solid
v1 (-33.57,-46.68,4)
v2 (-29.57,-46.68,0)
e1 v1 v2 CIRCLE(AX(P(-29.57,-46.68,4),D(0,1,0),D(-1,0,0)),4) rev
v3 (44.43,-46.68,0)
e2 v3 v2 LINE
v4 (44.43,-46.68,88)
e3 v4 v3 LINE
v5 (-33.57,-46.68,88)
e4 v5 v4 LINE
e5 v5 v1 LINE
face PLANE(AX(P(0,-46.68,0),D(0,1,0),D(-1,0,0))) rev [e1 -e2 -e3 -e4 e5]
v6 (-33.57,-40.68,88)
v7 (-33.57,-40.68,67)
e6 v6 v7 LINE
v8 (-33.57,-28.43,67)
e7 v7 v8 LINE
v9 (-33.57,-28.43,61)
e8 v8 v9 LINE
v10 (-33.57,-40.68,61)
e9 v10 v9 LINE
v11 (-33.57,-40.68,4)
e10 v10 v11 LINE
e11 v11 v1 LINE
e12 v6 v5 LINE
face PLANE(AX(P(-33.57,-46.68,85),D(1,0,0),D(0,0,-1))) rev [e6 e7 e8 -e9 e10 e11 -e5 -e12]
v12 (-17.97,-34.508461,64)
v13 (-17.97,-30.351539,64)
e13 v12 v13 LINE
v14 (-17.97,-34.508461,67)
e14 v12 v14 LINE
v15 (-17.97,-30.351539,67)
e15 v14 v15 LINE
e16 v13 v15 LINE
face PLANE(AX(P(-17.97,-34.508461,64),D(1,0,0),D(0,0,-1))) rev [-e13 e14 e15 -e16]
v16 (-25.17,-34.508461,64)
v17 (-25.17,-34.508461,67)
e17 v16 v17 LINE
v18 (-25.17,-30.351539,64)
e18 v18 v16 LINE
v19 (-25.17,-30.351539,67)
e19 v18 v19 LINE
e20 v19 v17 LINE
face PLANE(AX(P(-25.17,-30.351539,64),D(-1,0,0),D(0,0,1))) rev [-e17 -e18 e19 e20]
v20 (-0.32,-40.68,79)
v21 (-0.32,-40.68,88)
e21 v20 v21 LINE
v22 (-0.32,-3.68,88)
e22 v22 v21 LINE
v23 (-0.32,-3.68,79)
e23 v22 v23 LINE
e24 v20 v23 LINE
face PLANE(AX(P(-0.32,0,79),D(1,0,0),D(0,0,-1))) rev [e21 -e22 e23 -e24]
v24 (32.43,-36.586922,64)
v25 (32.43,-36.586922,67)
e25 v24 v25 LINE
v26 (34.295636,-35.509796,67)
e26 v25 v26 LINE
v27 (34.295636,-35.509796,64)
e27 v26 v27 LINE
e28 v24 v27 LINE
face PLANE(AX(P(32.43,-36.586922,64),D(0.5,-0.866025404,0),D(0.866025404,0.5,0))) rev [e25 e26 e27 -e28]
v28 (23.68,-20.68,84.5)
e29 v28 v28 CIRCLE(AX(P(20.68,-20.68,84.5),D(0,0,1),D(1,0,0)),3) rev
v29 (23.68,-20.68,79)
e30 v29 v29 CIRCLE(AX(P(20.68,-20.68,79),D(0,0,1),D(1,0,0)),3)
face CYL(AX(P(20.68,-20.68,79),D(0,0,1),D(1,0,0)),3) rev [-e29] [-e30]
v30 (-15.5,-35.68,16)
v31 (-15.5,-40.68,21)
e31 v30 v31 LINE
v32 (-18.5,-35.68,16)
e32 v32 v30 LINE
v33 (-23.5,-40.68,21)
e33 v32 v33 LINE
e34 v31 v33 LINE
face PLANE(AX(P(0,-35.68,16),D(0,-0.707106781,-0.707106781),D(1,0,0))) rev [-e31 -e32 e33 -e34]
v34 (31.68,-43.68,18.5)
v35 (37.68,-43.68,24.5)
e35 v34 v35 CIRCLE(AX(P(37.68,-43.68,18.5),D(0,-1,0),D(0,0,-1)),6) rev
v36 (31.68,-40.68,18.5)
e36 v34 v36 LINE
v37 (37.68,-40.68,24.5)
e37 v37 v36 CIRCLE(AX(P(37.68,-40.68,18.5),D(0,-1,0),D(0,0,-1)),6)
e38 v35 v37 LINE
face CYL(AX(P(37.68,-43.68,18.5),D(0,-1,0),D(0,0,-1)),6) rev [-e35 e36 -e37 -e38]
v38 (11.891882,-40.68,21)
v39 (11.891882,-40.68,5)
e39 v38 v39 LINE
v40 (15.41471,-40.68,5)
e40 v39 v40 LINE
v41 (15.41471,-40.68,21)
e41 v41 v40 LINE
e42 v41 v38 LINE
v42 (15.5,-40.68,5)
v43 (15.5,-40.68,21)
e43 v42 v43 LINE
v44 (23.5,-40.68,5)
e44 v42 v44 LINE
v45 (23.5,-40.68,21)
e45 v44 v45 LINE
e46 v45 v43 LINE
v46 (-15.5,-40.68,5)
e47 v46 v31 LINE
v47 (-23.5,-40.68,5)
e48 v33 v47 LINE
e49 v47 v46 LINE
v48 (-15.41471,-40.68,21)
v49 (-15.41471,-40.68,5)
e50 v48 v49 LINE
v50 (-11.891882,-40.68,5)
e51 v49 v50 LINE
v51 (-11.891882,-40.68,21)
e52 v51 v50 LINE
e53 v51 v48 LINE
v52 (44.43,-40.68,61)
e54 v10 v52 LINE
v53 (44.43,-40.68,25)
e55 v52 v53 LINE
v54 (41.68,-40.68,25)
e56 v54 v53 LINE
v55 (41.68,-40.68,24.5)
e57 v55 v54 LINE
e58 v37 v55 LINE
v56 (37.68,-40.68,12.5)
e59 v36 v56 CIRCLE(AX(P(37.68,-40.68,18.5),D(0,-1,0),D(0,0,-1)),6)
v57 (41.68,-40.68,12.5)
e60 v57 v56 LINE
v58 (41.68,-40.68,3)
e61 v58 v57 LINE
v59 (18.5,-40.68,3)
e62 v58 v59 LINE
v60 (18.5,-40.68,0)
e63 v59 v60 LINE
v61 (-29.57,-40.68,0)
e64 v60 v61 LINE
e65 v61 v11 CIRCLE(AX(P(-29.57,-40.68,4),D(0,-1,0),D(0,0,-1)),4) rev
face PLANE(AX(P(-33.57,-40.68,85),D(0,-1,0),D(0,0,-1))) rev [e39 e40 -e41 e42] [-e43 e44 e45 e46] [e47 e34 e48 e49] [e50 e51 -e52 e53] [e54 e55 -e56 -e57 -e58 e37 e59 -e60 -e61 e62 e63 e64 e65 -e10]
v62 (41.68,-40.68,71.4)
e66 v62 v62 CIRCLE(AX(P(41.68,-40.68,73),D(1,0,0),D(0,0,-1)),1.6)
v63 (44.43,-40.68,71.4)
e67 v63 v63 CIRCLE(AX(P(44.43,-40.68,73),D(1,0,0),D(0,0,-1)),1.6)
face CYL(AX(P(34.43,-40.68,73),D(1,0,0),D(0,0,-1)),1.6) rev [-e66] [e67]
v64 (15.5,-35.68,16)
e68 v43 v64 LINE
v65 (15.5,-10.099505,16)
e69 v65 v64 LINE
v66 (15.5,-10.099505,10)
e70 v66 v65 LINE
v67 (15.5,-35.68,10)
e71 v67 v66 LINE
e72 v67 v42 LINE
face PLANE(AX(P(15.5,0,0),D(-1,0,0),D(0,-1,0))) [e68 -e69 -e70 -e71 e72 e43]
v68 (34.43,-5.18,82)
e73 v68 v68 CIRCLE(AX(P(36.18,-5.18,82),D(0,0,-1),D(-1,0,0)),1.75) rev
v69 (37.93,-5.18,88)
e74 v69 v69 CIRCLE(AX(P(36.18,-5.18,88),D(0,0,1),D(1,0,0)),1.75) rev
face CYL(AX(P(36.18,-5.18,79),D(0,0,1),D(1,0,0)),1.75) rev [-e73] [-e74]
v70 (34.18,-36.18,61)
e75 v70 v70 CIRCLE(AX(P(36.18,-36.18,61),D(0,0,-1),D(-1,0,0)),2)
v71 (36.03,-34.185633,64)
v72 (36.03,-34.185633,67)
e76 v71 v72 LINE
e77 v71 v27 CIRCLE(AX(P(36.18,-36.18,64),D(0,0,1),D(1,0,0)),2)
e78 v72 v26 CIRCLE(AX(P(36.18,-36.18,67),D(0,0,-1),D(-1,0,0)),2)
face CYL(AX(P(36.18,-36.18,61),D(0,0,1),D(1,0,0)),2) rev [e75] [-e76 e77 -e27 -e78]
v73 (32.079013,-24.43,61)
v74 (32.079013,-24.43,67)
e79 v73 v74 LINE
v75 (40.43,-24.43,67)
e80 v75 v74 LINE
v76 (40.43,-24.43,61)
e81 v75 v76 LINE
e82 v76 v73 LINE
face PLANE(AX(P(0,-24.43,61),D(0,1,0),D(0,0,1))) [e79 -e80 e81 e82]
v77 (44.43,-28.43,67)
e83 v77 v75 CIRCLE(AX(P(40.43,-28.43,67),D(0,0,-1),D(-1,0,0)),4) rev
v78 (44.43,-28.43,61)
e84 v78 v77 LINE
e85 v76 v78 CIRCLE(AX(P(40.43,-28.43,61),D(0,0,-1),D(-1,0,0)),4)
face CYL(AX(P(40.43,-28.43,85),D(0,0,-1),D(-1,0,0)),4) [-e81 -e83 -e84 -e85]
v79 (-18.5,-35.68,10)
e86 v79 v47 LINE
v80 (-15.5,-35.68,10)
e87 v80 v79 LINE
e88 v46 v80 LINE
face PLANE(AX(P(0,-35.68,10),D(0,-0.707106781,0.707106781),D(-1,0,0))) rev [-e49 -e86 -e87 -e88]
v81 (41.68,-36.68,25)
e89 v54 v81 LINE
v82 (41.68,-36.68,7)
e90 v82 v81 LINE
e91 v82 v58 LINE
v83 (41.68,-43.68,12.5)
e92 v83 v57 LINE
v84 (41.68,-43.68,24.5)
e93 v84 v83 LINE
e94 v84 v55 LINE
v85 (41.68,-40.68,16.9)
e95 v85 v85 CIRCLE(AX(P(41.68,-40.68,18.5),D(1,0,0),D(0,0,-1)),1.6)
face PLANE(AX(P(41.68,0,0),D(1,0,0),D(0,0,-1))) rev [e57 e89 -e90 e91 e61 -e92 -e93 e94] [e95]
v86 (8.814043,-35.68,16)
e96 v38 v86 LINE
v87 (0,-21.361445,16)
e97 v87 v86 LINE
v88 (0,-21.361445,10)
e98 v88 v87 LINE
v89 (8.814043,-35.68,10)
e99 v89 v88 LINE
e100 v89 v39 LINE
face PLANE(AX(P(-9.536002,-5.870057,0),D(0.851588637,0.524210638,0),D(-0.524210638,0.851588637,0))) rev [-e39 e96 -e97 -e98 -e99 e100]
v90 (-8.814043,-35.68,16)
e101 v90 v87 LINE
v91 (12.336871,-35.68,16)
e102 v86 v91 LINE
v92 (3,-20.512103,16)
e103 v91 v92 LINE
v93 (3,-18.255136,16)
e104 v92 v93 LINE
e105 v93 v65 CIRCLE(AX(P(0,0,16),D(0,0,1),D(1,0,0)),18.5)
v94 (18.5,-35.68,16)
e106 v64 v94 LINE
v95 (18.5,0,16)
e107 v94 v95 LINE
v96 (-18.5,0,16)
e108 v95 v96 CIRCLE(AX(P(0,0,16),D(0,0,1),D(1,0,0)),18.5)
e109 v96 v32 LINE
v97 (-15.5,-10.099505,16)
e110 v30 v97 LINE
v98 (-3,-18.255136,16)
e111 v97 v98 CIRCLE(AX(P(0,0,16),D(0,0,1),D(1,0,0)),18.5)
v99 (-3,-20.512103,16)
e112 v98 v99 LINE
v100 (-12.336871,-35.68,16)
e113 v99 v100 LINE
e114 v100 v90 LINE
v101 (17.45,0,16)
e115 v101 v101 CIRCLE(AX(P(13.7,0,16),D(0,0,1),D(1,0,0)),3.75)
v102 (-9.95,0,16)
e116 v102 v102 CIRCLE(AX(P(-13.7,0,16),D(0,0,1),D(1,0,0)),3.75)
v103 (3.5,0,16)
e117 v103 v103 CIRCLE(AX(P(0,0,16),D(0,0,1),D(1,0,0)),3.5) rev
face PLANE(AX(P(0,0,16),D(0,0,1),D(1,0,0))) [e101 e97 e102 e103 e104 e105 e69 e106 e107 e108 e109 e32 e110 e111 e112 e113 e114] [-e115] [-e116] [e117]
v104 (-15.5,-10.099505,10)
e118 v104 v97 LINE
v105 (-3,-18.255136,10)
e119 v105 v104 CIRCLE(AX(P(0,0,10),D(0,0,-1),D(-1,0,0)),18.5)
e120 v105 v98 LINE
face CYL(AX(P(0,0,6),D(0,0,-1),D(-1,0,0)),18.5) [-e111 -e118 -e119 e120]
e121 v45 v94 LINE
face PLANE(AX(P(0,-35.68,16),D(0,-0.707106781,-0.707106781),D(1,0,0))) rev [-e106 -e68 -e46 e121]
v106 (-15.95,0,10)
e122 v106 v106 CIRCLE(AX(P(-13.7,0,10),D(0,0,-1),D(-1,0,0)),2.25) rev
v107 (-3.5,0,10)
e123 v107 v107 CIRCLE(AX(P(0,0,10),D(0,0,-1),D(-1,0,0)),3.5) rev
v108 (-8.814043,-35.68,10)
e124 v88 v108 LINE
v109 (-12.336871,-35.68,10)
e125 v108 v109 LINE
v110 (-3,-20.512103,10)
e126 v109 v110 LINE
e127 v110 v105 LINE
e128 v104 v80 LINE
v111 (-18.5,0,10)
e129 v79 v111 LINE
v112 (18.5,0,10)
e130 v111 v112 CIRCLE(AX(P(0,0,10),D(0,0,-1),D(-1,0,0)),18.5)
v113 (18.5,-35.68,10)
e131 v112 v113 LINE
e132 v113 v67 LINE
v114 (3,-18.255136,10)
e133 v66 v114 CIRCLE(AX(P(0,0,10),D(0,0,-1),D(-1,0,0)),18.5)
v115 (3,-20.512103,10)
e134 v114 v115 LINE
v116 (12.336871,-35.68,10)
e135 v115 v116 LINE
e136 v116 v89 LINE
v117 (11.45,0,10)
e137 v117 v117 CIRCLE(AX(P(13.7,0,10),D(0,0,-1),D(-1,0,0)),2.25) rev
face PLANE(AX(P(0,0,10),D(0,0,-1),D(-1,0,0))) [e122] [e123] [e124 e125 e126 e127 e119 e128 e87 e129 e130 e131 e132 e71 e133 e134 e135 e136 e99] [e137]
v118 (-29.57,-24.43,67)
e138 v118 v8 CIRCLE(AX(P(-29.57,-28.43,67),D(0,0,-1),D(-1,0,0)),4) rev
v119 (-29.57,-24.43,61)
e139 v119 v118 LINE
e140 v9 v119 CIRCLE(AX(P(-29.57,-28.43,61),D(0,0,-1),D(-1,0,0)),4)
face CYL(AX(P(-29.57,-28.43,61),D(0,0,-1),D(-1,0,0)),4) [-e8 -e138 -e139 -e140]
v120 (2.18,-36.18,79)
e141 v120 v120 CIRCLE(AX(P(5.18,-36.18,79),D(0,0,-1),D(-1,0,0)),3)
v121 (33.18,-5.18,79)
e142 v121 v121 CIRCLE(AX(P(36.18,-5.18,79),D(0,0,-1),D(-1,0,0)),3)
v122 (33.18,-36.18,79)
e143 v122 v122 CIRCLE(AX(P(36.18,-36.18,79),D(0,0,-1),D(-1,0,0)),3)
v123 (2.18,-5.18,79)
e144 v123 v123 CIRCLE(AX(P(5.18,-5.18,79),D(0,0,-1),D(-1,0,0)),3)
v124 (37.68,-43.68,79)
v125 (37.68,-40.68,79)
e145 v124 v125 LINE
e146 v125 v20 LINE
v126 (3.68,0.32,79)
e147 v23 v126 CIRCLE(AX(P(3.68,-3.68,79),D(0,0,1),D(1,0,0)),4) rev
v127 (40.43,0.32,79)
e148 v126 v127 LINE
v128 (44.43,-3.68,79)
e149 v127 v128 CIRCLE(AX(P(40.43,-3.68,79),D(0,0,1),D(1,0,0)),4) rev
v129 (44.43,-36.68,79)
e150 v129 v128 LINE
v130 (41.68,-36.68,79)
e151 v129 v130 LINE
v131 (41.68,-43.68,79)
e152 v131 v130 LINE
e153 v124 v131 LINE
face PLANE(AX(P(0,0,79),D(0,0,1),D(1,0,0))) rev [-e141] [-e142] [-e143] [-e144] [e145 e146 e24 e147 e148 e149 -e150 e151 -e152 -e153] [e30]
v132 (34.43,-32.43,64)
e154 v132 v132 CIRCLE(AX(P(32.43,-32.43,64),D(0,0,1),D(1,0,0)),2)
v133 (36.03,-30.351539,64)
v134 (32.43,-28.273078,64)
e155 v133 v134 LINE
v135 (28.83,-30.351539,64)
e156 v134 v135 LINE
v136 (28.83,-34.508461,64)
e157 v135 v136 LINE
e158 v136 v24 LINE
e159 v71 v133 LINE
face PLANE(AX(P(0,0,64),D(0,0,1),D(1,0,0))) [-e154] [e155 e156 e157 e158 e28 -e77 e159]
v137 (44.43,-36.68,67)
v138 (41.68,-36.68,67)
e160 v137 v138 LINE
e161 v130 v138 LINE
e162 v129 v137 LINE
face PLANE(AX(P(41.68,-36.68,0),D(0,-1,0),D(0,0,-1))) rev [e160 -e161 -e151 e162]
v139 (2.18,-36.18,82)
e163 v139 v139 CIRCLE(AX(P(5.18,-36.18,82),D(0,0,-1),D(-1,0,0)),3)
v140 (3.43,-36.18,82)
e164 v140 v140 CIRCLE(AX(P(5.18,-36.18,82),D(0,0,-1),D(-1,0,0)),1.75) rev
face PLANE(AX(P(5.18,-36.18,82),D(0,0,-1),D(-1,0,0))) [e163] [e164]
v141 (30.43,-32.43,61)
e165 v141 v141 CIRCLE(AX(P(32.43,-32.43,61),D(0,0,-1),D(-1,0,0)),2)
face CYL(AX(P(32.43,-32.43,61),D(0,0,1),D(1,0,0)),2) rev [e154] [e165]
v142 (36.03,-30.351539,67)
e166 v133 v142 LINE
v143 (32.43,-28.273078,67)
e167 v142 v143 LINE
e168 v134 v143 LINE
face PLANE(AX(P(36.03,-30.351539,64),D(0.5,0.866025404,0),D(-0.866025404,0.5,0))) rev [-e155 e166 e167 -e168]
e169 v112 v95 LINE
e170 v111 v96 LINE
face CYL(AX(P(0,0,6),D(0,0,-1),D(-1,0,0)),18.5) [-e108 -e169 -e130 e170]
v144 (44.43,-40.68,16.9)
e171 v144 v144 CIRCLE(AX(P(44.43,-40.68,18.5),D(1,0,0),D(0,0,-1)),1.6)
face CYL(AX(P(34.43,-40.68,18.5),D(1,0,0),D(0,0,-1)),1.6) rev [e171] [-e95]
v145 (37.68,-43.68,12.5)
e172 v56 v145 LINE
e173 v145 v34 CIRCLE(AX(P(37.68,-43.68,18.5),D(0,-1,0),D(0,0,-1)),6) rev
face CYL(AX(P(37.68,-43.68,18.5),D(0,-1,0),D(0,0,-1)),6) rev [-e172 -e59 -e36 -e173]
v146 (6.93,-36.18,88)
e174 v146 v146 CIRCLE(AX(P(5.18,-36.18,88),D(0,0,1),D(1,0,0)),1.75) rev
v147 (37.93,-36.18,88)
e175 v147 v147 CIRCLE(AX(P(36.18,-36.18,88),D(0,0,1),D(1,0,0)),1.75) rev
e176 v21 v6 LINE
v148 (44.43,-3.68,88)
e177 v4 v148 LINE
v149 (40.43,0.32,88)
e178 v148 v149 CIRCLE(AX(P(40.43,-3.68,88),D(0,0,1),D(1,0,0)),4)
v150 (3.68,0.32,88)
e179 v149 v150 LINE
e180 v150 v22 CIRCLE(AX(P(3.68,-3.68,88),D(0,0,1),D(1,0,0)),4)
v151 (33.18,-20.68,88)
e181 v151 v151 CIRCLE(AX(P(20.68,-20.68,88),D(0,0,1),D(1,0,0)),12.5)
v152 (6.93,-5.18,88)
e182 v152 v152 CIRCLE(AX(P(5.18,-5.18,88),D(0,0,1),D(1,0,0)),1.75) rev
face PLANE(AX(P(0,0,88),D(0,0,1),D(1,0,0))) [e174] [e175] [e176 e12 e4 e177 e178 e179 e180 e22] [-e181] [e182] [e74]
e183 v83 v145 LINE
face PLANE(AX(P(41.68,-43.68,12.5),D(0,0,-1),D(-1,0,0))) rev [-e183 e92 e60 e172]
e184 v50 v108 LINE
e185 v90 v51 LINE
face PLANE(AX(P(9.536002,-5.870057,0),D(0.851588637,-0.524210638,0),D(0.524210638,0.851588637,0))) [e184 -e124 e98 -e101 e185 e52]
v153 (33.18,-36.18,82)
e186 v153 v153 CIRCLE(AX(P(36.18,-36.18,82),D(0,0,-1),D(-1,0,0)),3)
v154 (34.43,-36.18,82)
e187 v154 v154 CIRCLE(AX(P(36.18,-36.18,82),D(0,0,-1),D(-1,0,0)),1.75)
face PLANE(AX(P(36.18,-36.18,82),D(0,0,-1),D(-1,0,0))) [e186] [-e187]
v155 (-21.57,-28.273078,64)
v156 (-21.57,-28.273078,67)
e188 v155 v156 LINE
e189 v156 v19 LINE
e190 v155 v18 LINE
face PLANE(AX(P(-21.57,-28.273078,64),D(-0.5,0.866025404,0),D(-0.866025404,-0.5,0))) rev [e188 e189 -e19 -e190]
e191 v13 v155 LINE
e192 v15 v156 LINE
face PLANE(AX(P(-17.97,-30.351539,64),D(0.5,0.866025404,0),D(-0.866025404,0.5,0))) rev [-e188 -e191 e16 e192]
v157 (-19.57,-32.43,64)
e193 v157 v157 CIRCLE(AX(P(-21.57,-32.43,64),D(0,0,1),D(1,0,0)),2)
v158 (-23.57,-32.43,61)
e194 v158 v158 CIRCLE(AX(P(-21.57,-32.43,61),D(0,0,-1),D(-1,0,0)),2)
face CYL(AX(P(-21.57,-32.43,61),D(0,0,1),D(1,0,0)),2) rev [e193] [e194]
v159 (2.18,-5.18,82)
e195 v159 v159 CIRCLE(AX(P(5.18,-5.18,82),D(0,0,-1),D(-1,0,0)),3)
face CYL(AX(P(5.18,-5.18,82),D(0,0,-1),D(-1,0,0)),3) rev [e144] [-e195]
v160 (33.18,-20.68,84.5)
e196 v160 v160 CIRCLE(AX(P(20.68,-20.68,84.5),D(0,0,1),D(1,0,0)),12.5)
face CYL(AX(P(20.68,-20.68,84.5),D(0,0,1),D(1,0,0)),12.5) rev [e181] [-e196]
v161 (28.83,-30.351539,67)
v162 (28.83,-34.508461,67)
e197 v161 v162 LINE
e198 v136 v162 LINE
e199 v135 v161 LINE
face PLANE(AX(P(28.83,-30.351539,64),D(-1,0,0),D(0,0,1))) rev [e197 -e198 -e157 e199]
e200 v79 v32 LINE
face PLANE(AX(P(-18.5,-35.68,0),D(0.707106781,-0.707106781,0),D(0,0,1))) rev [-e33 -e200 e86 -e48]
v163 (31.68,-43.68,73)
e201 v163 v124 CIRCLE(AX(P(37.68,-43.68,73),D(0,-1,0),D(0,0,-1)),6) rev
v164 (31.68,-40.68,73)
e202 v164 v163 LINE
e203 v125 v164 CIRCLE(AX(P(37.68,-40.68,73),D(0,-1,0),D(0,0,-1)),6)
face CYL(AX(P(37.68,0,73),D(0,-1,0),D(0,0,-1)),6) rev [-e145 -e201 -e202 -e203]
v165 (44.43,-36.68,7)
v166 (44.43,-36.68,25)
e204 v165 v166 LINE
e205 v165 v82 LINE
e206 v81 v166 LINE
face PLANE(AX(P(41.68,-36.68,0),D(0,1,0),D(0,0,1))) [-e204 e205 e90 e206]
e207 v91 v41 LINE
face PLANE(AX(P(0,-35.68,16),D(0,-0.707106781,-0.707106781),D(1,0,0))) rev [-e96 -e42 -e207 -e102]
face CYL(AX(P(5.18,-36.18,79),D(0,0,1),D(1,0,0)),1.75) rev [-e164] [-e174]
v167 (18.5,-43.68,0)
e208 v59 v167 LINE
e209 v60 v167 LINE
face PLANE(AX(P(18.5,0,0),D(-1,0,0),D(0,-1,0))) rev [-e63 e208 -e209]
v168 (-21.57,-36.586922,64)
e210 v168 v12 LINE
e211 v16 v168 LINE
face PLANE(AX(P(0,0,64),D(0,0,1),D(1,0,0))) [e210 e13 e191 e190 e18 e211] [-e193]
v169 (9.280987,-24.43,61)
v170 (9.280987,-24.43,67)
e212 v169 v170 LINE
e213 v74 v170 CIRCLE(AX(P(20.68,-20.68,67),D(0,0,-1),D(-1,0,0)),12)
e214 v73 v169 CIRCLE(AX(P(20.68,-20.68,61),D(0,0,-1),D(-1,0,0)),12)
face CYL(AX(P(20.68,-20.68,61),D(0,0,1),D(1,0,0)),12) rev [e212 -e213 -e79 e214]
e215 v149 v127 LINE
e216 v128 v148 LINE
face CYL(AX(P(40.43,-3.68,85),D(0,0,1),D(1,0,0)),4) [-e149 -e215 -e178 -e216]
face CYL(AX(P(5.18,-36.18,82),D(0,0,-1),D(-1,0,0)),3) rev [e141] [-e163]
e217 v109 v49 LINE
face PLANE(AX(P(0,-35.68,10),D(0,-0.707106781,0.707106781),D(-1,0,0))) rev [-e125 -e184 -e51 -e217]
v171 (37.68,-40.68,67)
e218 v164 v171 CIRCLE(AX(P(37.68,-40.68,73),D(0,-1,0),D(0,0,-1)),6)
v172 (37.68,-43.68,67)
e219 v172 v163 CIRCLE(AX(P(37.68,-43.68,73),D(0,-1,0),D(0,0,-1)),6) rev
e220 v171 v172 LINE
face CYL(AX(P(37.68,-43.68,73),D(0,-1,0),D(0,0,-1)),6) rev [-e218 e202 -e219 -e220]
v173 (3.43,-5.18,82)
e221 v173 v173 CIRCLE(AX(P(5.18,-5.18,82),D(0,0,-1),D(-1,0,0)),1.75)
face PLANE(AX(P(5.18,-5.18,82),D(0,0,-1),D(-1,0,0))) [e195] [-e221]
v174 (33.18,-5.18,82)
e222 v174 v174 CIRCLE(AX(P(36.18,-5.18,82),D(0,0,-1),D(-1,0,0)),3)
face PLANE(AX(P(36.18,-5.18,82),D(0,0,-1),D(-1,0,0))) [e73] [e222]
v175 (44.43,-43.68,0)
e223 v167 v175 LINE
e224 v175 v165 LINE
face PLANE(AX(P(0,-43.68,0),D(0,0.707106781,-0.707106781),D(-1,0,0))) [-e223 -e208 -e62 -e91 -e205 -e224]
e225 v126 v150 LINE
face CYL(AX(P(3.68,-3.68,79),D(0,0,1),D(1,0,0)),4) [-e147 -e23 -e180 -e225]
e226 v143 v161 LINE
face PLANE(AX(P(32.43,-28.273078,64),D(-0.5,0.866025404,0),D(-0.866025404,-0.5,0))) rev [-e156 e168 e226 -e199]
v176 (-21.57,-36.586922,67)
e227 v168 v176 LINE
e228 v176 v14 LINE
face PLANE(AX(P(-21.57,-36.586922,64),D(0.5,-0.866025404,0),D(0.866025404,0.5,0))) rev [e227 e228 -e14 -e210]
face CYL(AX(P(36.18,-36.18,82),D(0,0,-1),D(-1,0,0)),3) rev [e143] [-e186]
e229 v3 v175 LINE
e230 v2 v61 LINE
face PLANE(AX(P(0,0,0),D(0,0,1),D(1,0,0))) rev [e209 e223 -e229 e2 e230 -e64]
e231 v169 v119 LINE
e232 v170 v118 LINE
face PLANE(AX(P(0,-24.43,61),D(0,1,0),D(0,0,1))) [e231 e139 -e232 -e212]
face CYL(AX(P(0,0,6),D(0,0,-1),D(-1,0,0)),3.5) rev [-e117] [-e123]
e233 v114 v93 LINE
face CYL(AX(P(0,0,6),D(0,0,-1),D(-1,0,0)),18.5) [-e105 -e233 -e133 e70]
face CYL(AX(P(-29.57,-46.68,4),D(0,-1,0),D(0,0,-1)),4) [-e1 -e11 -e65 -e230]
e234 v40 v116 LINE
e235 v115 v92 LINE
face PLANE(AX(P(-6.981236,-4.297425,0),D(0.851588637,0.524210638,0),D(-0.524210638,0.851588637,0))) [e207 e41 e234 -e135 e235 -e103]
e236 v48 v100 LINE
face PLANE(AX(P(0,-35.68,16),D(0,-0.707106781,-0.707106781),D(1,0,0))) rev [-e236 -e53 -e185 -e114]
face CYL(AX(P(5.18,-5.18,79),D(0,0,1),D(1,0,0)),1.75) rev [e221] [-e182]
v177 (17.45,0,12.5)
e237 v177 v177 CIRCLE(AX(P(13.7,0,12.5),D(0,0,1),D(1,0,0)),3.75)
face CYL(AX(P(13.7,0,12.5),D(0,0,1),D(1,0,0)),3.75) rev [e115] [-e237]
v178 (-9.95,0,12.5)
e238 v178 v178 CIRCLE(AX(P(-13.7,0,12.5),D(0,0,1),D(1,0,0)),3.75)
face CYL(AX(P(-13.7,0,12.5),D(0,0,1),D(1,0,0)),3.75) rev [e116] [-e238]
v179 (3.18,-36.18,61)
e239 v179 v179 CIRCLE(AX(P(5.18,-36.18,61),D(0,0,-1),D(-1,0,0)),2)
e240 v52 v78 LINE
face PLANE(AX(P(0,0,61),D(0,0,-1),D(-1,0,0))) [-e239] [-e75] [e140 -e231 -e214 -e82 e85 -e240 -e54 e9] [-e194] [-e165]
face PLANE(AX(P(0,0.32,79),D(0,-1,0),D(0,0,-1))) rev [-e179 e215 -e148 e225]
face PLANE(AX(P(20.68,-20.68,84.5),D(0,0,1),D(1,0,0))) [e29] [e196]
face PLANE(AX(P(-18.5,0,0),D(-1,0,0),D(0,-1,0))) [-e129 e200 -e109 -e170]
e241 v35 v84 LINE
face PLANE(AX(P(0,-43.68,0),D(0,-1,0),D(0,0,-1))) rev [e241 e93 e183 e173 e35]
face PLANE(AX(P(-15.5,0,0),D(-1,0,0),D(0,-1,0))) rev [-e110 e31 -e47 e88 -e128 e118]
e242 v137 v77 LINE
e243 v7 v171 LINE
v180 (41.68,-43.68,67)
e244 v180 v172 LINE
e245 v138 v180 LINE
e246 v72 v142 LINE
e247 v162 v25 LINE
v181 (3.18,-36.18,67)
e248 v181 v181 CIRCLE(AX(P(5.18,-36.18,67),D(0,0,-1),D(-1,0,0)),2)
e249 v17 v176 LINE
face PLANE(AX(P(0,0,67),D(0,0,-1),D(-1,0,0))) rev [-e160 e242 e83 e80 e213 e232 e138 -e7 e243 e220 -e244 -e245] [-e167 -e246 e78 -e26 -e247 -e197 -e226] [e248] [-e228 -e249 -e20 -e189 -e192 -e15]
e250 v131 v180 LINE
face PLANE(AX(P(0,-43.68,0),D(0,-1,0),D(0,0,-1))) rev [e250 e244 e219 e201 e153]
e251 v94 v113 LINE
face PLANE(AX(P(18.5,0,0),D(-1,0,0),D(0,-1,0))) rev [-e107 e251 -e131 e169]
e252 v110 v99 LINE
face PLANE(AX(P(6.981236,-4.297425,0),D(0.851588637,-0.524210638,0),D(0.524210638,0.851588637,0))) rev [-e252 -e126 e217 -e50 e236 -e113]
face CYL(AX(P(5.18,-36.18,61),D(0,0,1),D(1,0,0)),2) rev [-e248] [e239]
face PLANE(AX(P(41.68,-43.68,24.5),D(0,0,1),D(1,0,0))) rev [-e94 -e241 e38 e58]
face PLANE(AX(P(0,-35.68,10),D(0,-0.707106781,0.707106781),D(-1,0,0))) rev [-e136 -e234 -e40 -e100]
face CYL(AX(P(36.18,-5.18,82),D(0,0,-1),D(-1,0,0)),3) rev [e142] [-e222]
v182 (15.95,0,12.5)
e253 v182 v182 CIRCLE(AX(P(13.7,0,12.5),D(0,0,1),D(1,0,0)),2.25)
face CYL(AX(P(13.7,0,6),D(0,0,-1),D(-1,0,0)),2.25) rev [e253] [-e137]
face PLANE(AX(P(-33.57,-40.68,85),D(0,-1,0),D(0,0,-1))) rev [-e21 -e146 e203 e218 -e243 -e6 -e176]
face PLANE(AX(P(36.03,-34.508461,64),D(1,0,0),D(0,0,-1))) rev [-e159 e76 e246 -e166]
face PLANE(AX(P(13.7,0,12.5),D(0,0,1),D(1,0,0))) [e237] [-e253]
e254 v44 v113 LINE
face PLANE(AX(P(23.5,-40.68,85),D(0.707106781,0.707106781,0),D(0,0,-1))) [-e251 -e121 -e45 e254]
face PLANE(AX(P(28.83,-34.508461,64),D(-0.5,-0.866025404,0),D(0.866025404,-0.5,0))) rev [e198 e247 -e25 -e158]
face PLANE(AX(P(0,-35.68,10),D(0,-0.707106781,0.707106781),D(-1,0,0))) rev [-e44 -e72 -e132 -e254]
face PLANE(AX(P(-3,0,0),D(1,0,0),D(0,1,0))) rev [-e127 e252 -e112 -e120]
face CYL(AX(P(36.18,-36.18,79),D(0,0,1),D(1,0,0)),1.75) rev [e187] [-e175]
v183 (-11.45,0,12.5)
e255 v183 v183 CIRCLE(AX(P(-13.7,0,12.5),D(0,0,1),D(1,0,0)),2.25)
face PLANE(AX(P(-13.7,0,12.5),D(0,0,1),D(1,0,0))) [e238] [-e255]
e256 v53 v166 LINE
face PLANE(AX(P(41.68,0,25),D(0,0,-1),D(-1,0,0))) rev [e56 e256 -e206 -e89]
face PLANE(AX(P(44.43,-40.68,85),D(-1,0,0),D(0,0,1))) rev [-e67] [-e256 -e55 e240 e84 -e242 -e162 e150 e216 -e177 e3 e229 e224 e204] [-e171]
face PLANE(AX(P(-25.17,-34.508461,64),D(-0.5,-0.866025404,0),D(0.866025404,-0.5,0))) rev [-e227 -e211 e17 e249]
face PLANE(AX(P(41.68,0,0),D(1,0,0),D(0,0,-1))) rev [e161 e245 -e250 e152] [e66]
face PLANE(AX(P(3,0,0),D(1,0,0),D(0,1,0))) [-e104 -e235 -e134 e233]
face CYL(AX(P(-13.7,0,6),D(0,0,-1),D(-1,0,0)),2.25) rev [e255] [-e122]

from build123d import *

# Parameters (mm, degrees)
SKETCH1_R           = 18.5
SKETCH1_R_2         = 3.5
SKETCH1_R_3         = 2.25
BOSS_EXTRUDE1_DEPTH = 6
BOSS_EXTRUDE2_START = -6
BOSS_EXTRUDE2_DEPTH = 6
BOSS_EXTRUDE3_DEPTH = 85
SKETCH6_R           = 2
BOSS_EXTRUDE5_DEPTH = 6
SKETCH5_W           = 42
SKETCH5_H           = 41
SKETCH5_R           = 1.75
SKETCH5_R_2         = 3
BOSS_EXTRUDE4_DEPTH = 6
SKETCH8_W           = 25
SKETCH8_H           = 7
BOSS_EXTRUDE7_DEPTH = 2.75
CHAMFER2_SIZE       = 7
SKETCH9_R           = 1.6
CUT_EXTRUDE2_DEPTH  = 10
SKETCH10_W          = 10
SKETCH10_H          = 12
CUT_EXTRUDE3_DEPTH  = 3
FILLET1_R           = 6
SKETCH11_R          = 2.25
SKETCH11_R_2        = 3.5
BOSS_EXTRUDE8_DEPTH = 10
SKETCH13_R          = 2.25
SKETCH13_R_2        = 3.5
CUT_EXTRUDE4_DEPTH  = 10
SKETCH14_R          = 3.75
CUT_EXTRUDE5_DEPTH  = 3.5
CHAMFER4_SIZE       = 5
FILLET2_R           = 4
CUT_EXTRUDE6_DEPTH  = 3
BOSS_EXTRUDE9_START = 3
SKETCH18_R          = 1.75
SKETCH18_R_2        = 3
SKETCH18_W          = 33.25
SKETCH18_H          = 6
BOSS_EXTRUDE9_DEPTH = 3
SKETCH16_R          = 12.5
CUT_EXTRUDE7_DEPTH  = 3.5
SKETCH20_R          = 3
CUT_EXTRUDE8_DEPTH  = 3


# Some blends are built 0.0001 mm under size
with BuildPart() as part:
    # Sketch1 → Boss-Extrude1 (new body)
    with BuildSketch(Plane.XY):
        Circle(SKETCH1_R)
        Circle(SKETCH1_R_2, mode=Mode.SUBTRACT)
        with Locations((-13.7, 0)):
            Circle(SKETCH1_R_3, mode=Mode.SUBTRACT)
        with Locations((13.7, 0)):
            Circle(SKETCH1_R_3, mode=Mode.SUBTRACT)
    extrude(amount=BOSS_EXTRUDE1_DEPTH)

    # Sketch3 → Boss-Extrude2 (add)
    with BuildSketch(Plane.XY.offset(6).offset(BOSS_EXTRUDE2_START)):
        with BuildLine():
            ThreePointArc((-15.5, -10.099504938), (-17.734147851, -5.267826876), (-18.5, 0))
            Line((-18.5, 0), (-18.5, -46.68))
            Line((-18.5, -46.68), (18.5, -46.68))
            Line((18.5, -46.68), (18.5, 0))
            ThreePointArc((18.5, 0), (17.734147851, -5.267826876), (15.5, -10.099504938))
            Line((15.5, -10.099504938), (15.5, -40.818554828))
            Line((15.5, -40.818554828), (15.5, -43.68))
            Line((15.5, -43.68), (13.738586173, -43.68))
            Line((13.738586173, -43.68), (-13.738586173, -43.68))
            Line((-13.738586173, -43.68), (-15.5, -43.68))
            Line((-15.5, -43.68), (-15.5, -40.818554828))
            Line((-15.5, -40.818554828), (-15.5, -10.099504938))
        make_face()
        with BuildLine():
            Line((-3, -20.512103215), (-15.5, -40.818554828))
            Line((-15.5, -40.818554828), (-15.5, -43.68))
            Line((-15.5, -43.68), (-13.738586173, -43.68))
            Line((-13.738586173, -43.68), (0, -21.361445172))
            Line((0, -21.361445172), (13.738586173, -43.68))
            Line((13.738586173, -43.68), (15.5, -43.68))
            Line((15.5, -43.68), (15.5, -40.818554828))
            Line((15.5, -40.818554828), (3, -20.512103215))
            Line((3, -20.512103215), (1.71251735, -18.420566884))
            ThreePointArc((1.71251735, -18.420566884), (0, -18.5), (-1.71251735, -18.420566884))
            Line((-1.71251735, -18.420566884), (-3, -20.512103215))
        make_face()
        with BuildLine():
            Line((3, -20.512103215), (3, -18.255136264))
            ThreePointArc((3, -18.255136264), (2.357710068, -18.349147207), (1.71251735, -18.420566884))
            Line((1.71251735, -18.420566884), (3, -20.512103215))
        make_face()
        with BuildLine():
            ThreePointArc((-1.71251735, -18.420566884), (-2.357710068, -18.349147207), (-3, -18.255136264))
            Line((-3, -18.255136264), (-3, -20.512103215))
            Line((-3, -20.512103215), (-1.71251735, -18.420566884))
        make_face()
    extrude(amount=BOSS_EXTRUDE2_DEPTH)

    # Sketch4 → Boss-Extrude3 (add)
    with BuildSketch(Plane.XY):
        Polygon((-33.57, -46.68), (-33.57, -40.68), (44.43, -40.68), (44.43, -46.68), (-18.5, -46.68), align=None)
    extrude(amount=BOSS_EXTRUDE3_DEPTH)

    # Sketch6 → Boss-Extrude5 (add)
    with BuildSketch(Plane(origin=(0, 0, 67), x_dir=(-1, 0, 0), z_dir=(0, 0, -1))):
        with BuildLine():
            Line((-44.43, -24.43), (-44.43, -43.68))
            Line((-44.43, -43.68), (33.57, -43.68))
            Line((33.57, -43.68), (33.57, -24.43))
            Line((33.57, -24.43), (-9.280986885, -24.43))
            ThreePointArc((-9.280986885, -24.43), (-20.68, -32.68), (-32.079013115, -24.43))
            Line((-32.079013115, -24.43), (-44.43, -24.43))
        make_face()
        with Locations((-36.18, -36.18)):
            Circle(SKETCH6_R, mode=Mode.SUBTRACT)
        with Locations((-32.43, -32.43)):
            Circle(SKETCH6_R, mode=Mode.SUBTRACT)
        with Locations((-5.18, -36.18)):
            Circle(SKETCH6_R, mode=Mode.SUBTRACT)
        with Locations((21.57, -32.43)):
            Circle(SKETCH6_R, mode=Mode.SUBTRACT)
    extrude(amount=BOSS_EXTRUDE5_DEPTH)

    # Sketch5 → Boss-Extrude4 (add)
    with BuildSketch(Plane.XY.offset(85)):
        with Locations((20.68, -20.18)):
            Rectangle(SKETCH5_W, SKETCH5_H)
        with Locations((5.18, -36.18)):
            Circle(SKETCH5_R, mode=Mode.SUBTRACT)
        with Locations((36.18, -36.18)):
            Circle(SKETCH5_R, mode=Mode.SUBTRACT)
        with Locations((5.18, -5.18)):
            Circle(SKETCH5_R, mode=Mode.SUBTRACT)
        with Locations((20.68, -20.68)):
            Circle(SKETCH5_R_2, mode=Mode.SUBTRACT)
        with Locations((36.18, -5.18)):
            Circle(SKETCH5_R, mode=Mode.SUBTRACT)
    extrude(amount=-BOSS_EXTRUDE4_DEPTH)

    # Sketch8 → Boss-Extrude7 (add)
    with BuildSketch(Plane(origin=(44.43, 0, 0), x_dir=(0, 0, -1), z_dir=(1, 0, 0))):
        with Locations((-12.5, -40.18)):
            Rectangle(SKETCH8_W, SKETCH8_H)
        Polygon((-61, -36.68), (-79, -36.68), (-79, 0.32), (-85, 0.32), (-85, -43.68), (-61, -43.68), align=None)
    extrude(amount=-BOSS_EXTRUDE7_DEPTH)

    # Chamfer2
    # the kernel refuses this chamfer: 7 mm, written as the material it takes off along each edge
    with BuildSketch(Plane(origin=(62.431780916, -36.68, 0), x_dir=(0, 0, 1), z_dir=(-1, 0, 0))) as chamfer2_piece_1:
        Polygon((CHAMFER2_SIZE, 0), (0, -CHAMFER2_SIZE), (0, 0), align=None)
    extrude(amount=38.753561832, mode=Mode.SUBTRACT)
    # the kernel refuses this chamfer: 7 mm, written as the material it takes off along each edge
    with BuildSketch(Plane(origin=(18.5, -40.68, 0), x_dir=(0, -1, 0), z_dir=(1, 0, 0))) as chamfer2_2_piece_1_section:
        Polygon((CHAMFER2_SIZE, 0), (0, -CHAMFER2_SIZE), (0, 0), align=None)
    chamfer2_2_piece_1 = extrude(amount=23.18, mode=Mode.PRIVATE)
    chamfer2_2_piece_1 = split(chamfer2_2_piece_1, bisect_by=Plane(origin=(18.5, -42.18, 1.5), z_dir=(0, 0.7071067811865476, -0.7071067811865476)), keep=Keep.TOP, mode=Mode.PRIVATE)
    add(chamfer2_2_piece_1, mode=Mode.SUBTRACT)

    # Sketch9 → Cut-Extrude2 (cut)
    with BuildSketch(Plane(origin=(44.43, 0, 0), x_dir=(0, 0, -1), z_dir=(1, 0, 0))):
        with Locations((-73, -40.68)):
            Circle(SKETCH9_R)
        with Locations((-18.5, -40.68)):
            Circle(SKETCH9_R)
    extrude(amount=-CUT_EXTRUDE2_DEPTH, mode=Mode.SUBTRACT)

    # Sketch10 → Cut-Extrude3 (cut)
    with BuildSketch(Plane(origin=(0, -40.68, 0), x_dir=(1, 0, 0), z_dir=(0, 1, 0))):
        with Locations((36.68, -18.5)):
            Rectangle(SKETCH10_W, SKETCH10_H)
        with Locations((36.68, -73)):
            Rectangle(SKETCH10_W, SKETCH10_H)
    extrude(amount=-CUT_EXTRUDE3_DEPTH, mode=Mode.SUBTRACT)

    # Fillet1
    fillet1_edges = [part.edges().sort_by_distance(p)[0] for p in [
        (31.68, -42.18, 67),
        (31.68, -42.18, 79),
        (31.68, -42.18, 24.5),
        (31.68, -42.18, 12.5),
    ]]
    fillet(fillet1_edges, radius=FILLET1_R - 0.0001)  # a hair under: the kernel refuses the full size

    # Sketch11 → Boss-Extrude8 (add)
    with BuildSketch(Plane.XY.offset(6)):
        with BuildLine():
            Line((-15.5, -40.68), (-15.5, -10.099504938))
            ThreePointArc((-15.5, -10.099504938), (-10.10896041, -15.493834884), (-3, -18.255136264))
            Line((-3, -18.255136264), (-3, -20.512103215))
            Line((-3, -20.512103215), (-15.414710094, -40.68))
            Line((-15.414710094, -40.68), (-11.89188244, -40.68))
            Line((-11.89188244, -40.68), (0, -21.361445172))
            Line((0, -21.361445172), (11.89188244, -40.68))
            Line((11.89188244, -40.68), (15.414710094, -40.68))
            Line((15.414710094, -40.68), (3, -20.512103215))
            Line((3, -20.512103215), (3, -18.255136264))
            ThreePointArc((3, -18.255136264), (10.10896041, -15.493834884), (15.5, -10.099504938))
            Line((15.5, -10.099504938), (15.5, -40.68))
            Line((15.5, -40.68), (18.5, -40.68))
            Line((18.5, -40.68), (18.5, 0))
            ThreePointArc((18.5, 0), (0, 18.5), (-18.5, 0))
            Line((-18.5, 0), (-18.5, -40.68))
            Line((-18.5, -40.68), (-15.5, -40.68))
        make_face()
        with Locations((13.7, 0)):
            Circle(SKETCH11_R, mode=Mode.SUBTRACT)
        with Locations((-13.7, 0)):
            Circle(SKETCH11_R, mode=Mode.SUBTRACT)
        Circle(SKETCH11_R_2, mode=Mode.SUBTRACT)
    extrude(amount=BOSS_EXTRUDE8_DEPTH)

    # Sketch13 → Cut-Extrude4 (cut)
    # profile 1 of 4: a face of its own
    with BuildSketch(Plane(origin=(0, 0, 0), x_dir=(-1, 0, 0), z_dir=(0, 0, -1))):
        with BuildLine():
            ThreePointArc((3, -18.255136264), (0, -18.5), (-3, -18.255136264))
            Line((-3, -18.255136264), (-3, -20.512103215))
            Line((-3, -20.512103215), (-15.414710094, -40.68))
            Line((-15.414710094, -40.68), (-11.89188244, -40.68))
            Line((-11.89188244, -40.68), (0, -21.361445172))
            Line((0, -21.361445172), (11.89188244, -40.68))
            Line((11.89188244, -40.68), (15.414710094, -40.68))
            Line((15.414710094, -40.68), (3, -20.512103215))
            Line((3, -20.512103215), (3, -18.255136264))
        make_face()
    # profile 2 of 4: a face of its own
    with BuildSketch(Plane(origin=(0, 0, 0), x_dir=(-1, 0, 0), z_dir=(0, 0, -1))):
        with BuildLine():
            ThreePointArc((-15.5, -10.099504938), (-17.734147851, -5.267826876), (-18.5, 0))
            Line((-18.5, 0), (-18.5, -40.68))
            Line((-18.5, -40.68), (-15.5, -40.68))
            Line((-15.5, -40.68), (-15.5, -10.099504938))
        make_face()
    # profile 3 of 4: a face of its own
    with BuildSketch(Plane(origin=(0, 0, 0), x_dir=(-1, 0, 0), z_dir=(0, 0, -1))):
        with BuildLine():
            Line((18.5, -40.68), (18.5, 0))
            ThreePointArc((18.5, 0), (17.734147851, -5.267826876), (15.5, -10.099504938))
            Line((15.5, -10.099504938), (15.5, -40.68))
            Line((15.5, -40.68), (18.5, -40.68))
        make_face()
    # profile 4 of 4: a face of its own
    with BuildSketch(Plane(origin=(0, 0, 0), x_dir=(-1, 0, 0), z_dir=(0, 0, -1))):
        with BuildLine():
            ThreePointArc((18.5, 0), (0, 18.5), (-18.5, 0))
            ThreePointArc((-18.5, 0), (-17.734147851, -5.267826876), (-15.5, -10.099504938))
            ThreePointArc((-15.5, -10.099504938), (-10.10896041, -15.493834884), (-3, -18.255136264))
            ThreePointArc((-3, -18.255136264), (0, -18.5), (3, -18.255136264))
            ThreePointArc((3, -18.255136264), (10.10896041, -15.493834884), (15.5, -10.099504938))
            ThreePointArc((15.5, -10.099504938), (17.734147851, -5.267826876), (18.5, 0))
        make_face()
        with Locations((-13.7, 0)):
            Circle(SKETCH13_R, mode=Mode.SUBTRACT)
        Circle(SKETCH13_R_2, mode=Mode.SUBTRACT)
        with Locations((13.7, 0)):
            Circle(SKETCH13_R, mode=Mode.SUBTRACT)
    extrude(amount=-CUT_EXTRUDE4_DEPTH, mode=Mode.SUBTRACT)

    # Sketch14 → Cut-Extrude5 (cut)
    with BuildSketch(Plane.XY.offset(16)):
        with Locations((-13.7, 0)):
            Circle(SKETCH14_R)
        with Locations((13.7, 0)):
            Circle(SKETCH14_R)
    extrude(amount=-CUT_EXTRUDE5_DEPTH, mode=Mode.SUBTRACT)

    # Chamfer4
    chamfer4_edges = [part.edges().sort_by_distance(p)[0] for p in [
        (-17, -40.68, 16),
        (-13.653296267, -40.68, 16),
        (13.653296267, -40.68, 16),
        (17, -40.68, 16),
        (-18.5, -40.68, 13),
        (18.5, -40.68, 13),
        (-13.653296267, -40.68, 10),
        (13.653296267, -40.68, 10),
        (17, -40.68, 10),
        (-17, -40.68, 10),
    ]]
    chamfer(chamfer4_edges, length=CHAMFER4_SIZE)

    # Fillet2
    fillet2_edges = [part.edges().sort_by_distance(p)[0] for p in [
        (44.43, -24.43, 64),
        (-33.57, -24.43, 64),
        (-0.32, 0.32, 82),
        (44.43, 0.32, 82),
        (-33.57, -43.68, 0),
    ]]
    fillet(fillet2_edges, radius=FILLET2_R)

    # Sketch15 → Cut-Extrude6 (cut)
    with BuildSketch(Plane.XY.offset(67)):
        Polygon((-21.57, -28.273078062), (-25.17, -30.351539031), (-25.17, -34.508460969), (-21.57, -36.586921938), (-17.97, -34.508460969), (-17.97, -30.351539031), align=None)
        Polygon((32.43, -28.273078062), (28.83, -30.351539031), (28.83, -34.508460969), (32.43, -36.586921938), (36.03, -34.508460969), (36.03, -30.351539031), align=None)
    extrude(amount=-CUT_EXTRUDE6_DEPTH, mode=Mode.SUBTRACT)

    # Sketch18 → Boss-Extrude9 (add)
    # profile 1 of 2: a face of its own
    with BuildSketch(Plane.XY.offset(85).offset(BOSS_EXTRUDE9_START)):
        with BuildLine():
            ThreePointArc((44.43, -3.68), (43.258427125, -0.851572875), (40.43, 0.32))
            Line((40.43, 0.32), (3.68, 0.32))
            ThreePointArc((3.68, 0.32), (0.851572875, -0.851572875), (-0.32, -3.68))
            Line((-0.32, -3.68), (-0.32, -40.68))
            Line((-0.32, -40.68), (-0.32, -46.68))
            Line((-0.32, -46.68), (44.43, -46.68))
            Line((44.43, -46.68), (44.43, -3.68))
        make_face()
        with Locations((5.18, -36.18)):
            Circle(SKETCH18_R, mode=Mode.SUBTRACT)
        with Locations((36.18, -36.18)):
            Circle(SKETCH18_R, mode=Mode.SUBTRACT)
        with Locations((5.18, -5.18)):
            Circle(SKETCH18_R, mode=Mode.SUBTRACT)
        with Locations((20.68, -20.68)):
            Circle(SKETCH18_R_2, mode=Mode.SUBTRACT)
        with Locations((36.18, -5.18)):
            Circle(SKETCH18_R, mode=Mode.SUBTRACT)
    # profile 2 of 2: a face of its own
    with BuildSketch(Plane.XY.offset(85).offset(BOSS_EXTRUDE9_START)):
        with Locations((-16.945, -43.68)):
            Rectangle(SKETCH18_W, SKETCH18_H)
    extrude(amount=-BOSS_EXTRUDE9_DEPTH)

    # Sketch16 → Cut-Extrude7 (cut)
    with BuildSketch(Plane.XY.offset(88)):
        with Locations((20.68, -20.68)):
            Circle(SKETCH16_R)
    extrude(amount=-CUT_EXTRUDE7_DEPTH, mode=Mode.SUBTRACT)

    # Sketch20 → Cut-Extrude8 (cut)
    with BuildSketch(Plane(origin=(0, 0, 79), x_dir=(-1, 0, 0), z_dir=(0, 0, -1))):
        with Locations((-36.18, -5.18)):
            Circle(SKETCH20_R)
        with Locations((-5.18, -5.18)):
            Circle(SKETCH20_R)
        with Locations((-5.18, -36.18)):
            Circle(SKETCH20_R)
        with Locations((-36.18, -36.18)):
            Circle(SKETCH20_R)
    extrude(amount=-CUT_EXTRUDE8_DEPTH, mode=Mode.SUBTRACT)


solid = part.part
